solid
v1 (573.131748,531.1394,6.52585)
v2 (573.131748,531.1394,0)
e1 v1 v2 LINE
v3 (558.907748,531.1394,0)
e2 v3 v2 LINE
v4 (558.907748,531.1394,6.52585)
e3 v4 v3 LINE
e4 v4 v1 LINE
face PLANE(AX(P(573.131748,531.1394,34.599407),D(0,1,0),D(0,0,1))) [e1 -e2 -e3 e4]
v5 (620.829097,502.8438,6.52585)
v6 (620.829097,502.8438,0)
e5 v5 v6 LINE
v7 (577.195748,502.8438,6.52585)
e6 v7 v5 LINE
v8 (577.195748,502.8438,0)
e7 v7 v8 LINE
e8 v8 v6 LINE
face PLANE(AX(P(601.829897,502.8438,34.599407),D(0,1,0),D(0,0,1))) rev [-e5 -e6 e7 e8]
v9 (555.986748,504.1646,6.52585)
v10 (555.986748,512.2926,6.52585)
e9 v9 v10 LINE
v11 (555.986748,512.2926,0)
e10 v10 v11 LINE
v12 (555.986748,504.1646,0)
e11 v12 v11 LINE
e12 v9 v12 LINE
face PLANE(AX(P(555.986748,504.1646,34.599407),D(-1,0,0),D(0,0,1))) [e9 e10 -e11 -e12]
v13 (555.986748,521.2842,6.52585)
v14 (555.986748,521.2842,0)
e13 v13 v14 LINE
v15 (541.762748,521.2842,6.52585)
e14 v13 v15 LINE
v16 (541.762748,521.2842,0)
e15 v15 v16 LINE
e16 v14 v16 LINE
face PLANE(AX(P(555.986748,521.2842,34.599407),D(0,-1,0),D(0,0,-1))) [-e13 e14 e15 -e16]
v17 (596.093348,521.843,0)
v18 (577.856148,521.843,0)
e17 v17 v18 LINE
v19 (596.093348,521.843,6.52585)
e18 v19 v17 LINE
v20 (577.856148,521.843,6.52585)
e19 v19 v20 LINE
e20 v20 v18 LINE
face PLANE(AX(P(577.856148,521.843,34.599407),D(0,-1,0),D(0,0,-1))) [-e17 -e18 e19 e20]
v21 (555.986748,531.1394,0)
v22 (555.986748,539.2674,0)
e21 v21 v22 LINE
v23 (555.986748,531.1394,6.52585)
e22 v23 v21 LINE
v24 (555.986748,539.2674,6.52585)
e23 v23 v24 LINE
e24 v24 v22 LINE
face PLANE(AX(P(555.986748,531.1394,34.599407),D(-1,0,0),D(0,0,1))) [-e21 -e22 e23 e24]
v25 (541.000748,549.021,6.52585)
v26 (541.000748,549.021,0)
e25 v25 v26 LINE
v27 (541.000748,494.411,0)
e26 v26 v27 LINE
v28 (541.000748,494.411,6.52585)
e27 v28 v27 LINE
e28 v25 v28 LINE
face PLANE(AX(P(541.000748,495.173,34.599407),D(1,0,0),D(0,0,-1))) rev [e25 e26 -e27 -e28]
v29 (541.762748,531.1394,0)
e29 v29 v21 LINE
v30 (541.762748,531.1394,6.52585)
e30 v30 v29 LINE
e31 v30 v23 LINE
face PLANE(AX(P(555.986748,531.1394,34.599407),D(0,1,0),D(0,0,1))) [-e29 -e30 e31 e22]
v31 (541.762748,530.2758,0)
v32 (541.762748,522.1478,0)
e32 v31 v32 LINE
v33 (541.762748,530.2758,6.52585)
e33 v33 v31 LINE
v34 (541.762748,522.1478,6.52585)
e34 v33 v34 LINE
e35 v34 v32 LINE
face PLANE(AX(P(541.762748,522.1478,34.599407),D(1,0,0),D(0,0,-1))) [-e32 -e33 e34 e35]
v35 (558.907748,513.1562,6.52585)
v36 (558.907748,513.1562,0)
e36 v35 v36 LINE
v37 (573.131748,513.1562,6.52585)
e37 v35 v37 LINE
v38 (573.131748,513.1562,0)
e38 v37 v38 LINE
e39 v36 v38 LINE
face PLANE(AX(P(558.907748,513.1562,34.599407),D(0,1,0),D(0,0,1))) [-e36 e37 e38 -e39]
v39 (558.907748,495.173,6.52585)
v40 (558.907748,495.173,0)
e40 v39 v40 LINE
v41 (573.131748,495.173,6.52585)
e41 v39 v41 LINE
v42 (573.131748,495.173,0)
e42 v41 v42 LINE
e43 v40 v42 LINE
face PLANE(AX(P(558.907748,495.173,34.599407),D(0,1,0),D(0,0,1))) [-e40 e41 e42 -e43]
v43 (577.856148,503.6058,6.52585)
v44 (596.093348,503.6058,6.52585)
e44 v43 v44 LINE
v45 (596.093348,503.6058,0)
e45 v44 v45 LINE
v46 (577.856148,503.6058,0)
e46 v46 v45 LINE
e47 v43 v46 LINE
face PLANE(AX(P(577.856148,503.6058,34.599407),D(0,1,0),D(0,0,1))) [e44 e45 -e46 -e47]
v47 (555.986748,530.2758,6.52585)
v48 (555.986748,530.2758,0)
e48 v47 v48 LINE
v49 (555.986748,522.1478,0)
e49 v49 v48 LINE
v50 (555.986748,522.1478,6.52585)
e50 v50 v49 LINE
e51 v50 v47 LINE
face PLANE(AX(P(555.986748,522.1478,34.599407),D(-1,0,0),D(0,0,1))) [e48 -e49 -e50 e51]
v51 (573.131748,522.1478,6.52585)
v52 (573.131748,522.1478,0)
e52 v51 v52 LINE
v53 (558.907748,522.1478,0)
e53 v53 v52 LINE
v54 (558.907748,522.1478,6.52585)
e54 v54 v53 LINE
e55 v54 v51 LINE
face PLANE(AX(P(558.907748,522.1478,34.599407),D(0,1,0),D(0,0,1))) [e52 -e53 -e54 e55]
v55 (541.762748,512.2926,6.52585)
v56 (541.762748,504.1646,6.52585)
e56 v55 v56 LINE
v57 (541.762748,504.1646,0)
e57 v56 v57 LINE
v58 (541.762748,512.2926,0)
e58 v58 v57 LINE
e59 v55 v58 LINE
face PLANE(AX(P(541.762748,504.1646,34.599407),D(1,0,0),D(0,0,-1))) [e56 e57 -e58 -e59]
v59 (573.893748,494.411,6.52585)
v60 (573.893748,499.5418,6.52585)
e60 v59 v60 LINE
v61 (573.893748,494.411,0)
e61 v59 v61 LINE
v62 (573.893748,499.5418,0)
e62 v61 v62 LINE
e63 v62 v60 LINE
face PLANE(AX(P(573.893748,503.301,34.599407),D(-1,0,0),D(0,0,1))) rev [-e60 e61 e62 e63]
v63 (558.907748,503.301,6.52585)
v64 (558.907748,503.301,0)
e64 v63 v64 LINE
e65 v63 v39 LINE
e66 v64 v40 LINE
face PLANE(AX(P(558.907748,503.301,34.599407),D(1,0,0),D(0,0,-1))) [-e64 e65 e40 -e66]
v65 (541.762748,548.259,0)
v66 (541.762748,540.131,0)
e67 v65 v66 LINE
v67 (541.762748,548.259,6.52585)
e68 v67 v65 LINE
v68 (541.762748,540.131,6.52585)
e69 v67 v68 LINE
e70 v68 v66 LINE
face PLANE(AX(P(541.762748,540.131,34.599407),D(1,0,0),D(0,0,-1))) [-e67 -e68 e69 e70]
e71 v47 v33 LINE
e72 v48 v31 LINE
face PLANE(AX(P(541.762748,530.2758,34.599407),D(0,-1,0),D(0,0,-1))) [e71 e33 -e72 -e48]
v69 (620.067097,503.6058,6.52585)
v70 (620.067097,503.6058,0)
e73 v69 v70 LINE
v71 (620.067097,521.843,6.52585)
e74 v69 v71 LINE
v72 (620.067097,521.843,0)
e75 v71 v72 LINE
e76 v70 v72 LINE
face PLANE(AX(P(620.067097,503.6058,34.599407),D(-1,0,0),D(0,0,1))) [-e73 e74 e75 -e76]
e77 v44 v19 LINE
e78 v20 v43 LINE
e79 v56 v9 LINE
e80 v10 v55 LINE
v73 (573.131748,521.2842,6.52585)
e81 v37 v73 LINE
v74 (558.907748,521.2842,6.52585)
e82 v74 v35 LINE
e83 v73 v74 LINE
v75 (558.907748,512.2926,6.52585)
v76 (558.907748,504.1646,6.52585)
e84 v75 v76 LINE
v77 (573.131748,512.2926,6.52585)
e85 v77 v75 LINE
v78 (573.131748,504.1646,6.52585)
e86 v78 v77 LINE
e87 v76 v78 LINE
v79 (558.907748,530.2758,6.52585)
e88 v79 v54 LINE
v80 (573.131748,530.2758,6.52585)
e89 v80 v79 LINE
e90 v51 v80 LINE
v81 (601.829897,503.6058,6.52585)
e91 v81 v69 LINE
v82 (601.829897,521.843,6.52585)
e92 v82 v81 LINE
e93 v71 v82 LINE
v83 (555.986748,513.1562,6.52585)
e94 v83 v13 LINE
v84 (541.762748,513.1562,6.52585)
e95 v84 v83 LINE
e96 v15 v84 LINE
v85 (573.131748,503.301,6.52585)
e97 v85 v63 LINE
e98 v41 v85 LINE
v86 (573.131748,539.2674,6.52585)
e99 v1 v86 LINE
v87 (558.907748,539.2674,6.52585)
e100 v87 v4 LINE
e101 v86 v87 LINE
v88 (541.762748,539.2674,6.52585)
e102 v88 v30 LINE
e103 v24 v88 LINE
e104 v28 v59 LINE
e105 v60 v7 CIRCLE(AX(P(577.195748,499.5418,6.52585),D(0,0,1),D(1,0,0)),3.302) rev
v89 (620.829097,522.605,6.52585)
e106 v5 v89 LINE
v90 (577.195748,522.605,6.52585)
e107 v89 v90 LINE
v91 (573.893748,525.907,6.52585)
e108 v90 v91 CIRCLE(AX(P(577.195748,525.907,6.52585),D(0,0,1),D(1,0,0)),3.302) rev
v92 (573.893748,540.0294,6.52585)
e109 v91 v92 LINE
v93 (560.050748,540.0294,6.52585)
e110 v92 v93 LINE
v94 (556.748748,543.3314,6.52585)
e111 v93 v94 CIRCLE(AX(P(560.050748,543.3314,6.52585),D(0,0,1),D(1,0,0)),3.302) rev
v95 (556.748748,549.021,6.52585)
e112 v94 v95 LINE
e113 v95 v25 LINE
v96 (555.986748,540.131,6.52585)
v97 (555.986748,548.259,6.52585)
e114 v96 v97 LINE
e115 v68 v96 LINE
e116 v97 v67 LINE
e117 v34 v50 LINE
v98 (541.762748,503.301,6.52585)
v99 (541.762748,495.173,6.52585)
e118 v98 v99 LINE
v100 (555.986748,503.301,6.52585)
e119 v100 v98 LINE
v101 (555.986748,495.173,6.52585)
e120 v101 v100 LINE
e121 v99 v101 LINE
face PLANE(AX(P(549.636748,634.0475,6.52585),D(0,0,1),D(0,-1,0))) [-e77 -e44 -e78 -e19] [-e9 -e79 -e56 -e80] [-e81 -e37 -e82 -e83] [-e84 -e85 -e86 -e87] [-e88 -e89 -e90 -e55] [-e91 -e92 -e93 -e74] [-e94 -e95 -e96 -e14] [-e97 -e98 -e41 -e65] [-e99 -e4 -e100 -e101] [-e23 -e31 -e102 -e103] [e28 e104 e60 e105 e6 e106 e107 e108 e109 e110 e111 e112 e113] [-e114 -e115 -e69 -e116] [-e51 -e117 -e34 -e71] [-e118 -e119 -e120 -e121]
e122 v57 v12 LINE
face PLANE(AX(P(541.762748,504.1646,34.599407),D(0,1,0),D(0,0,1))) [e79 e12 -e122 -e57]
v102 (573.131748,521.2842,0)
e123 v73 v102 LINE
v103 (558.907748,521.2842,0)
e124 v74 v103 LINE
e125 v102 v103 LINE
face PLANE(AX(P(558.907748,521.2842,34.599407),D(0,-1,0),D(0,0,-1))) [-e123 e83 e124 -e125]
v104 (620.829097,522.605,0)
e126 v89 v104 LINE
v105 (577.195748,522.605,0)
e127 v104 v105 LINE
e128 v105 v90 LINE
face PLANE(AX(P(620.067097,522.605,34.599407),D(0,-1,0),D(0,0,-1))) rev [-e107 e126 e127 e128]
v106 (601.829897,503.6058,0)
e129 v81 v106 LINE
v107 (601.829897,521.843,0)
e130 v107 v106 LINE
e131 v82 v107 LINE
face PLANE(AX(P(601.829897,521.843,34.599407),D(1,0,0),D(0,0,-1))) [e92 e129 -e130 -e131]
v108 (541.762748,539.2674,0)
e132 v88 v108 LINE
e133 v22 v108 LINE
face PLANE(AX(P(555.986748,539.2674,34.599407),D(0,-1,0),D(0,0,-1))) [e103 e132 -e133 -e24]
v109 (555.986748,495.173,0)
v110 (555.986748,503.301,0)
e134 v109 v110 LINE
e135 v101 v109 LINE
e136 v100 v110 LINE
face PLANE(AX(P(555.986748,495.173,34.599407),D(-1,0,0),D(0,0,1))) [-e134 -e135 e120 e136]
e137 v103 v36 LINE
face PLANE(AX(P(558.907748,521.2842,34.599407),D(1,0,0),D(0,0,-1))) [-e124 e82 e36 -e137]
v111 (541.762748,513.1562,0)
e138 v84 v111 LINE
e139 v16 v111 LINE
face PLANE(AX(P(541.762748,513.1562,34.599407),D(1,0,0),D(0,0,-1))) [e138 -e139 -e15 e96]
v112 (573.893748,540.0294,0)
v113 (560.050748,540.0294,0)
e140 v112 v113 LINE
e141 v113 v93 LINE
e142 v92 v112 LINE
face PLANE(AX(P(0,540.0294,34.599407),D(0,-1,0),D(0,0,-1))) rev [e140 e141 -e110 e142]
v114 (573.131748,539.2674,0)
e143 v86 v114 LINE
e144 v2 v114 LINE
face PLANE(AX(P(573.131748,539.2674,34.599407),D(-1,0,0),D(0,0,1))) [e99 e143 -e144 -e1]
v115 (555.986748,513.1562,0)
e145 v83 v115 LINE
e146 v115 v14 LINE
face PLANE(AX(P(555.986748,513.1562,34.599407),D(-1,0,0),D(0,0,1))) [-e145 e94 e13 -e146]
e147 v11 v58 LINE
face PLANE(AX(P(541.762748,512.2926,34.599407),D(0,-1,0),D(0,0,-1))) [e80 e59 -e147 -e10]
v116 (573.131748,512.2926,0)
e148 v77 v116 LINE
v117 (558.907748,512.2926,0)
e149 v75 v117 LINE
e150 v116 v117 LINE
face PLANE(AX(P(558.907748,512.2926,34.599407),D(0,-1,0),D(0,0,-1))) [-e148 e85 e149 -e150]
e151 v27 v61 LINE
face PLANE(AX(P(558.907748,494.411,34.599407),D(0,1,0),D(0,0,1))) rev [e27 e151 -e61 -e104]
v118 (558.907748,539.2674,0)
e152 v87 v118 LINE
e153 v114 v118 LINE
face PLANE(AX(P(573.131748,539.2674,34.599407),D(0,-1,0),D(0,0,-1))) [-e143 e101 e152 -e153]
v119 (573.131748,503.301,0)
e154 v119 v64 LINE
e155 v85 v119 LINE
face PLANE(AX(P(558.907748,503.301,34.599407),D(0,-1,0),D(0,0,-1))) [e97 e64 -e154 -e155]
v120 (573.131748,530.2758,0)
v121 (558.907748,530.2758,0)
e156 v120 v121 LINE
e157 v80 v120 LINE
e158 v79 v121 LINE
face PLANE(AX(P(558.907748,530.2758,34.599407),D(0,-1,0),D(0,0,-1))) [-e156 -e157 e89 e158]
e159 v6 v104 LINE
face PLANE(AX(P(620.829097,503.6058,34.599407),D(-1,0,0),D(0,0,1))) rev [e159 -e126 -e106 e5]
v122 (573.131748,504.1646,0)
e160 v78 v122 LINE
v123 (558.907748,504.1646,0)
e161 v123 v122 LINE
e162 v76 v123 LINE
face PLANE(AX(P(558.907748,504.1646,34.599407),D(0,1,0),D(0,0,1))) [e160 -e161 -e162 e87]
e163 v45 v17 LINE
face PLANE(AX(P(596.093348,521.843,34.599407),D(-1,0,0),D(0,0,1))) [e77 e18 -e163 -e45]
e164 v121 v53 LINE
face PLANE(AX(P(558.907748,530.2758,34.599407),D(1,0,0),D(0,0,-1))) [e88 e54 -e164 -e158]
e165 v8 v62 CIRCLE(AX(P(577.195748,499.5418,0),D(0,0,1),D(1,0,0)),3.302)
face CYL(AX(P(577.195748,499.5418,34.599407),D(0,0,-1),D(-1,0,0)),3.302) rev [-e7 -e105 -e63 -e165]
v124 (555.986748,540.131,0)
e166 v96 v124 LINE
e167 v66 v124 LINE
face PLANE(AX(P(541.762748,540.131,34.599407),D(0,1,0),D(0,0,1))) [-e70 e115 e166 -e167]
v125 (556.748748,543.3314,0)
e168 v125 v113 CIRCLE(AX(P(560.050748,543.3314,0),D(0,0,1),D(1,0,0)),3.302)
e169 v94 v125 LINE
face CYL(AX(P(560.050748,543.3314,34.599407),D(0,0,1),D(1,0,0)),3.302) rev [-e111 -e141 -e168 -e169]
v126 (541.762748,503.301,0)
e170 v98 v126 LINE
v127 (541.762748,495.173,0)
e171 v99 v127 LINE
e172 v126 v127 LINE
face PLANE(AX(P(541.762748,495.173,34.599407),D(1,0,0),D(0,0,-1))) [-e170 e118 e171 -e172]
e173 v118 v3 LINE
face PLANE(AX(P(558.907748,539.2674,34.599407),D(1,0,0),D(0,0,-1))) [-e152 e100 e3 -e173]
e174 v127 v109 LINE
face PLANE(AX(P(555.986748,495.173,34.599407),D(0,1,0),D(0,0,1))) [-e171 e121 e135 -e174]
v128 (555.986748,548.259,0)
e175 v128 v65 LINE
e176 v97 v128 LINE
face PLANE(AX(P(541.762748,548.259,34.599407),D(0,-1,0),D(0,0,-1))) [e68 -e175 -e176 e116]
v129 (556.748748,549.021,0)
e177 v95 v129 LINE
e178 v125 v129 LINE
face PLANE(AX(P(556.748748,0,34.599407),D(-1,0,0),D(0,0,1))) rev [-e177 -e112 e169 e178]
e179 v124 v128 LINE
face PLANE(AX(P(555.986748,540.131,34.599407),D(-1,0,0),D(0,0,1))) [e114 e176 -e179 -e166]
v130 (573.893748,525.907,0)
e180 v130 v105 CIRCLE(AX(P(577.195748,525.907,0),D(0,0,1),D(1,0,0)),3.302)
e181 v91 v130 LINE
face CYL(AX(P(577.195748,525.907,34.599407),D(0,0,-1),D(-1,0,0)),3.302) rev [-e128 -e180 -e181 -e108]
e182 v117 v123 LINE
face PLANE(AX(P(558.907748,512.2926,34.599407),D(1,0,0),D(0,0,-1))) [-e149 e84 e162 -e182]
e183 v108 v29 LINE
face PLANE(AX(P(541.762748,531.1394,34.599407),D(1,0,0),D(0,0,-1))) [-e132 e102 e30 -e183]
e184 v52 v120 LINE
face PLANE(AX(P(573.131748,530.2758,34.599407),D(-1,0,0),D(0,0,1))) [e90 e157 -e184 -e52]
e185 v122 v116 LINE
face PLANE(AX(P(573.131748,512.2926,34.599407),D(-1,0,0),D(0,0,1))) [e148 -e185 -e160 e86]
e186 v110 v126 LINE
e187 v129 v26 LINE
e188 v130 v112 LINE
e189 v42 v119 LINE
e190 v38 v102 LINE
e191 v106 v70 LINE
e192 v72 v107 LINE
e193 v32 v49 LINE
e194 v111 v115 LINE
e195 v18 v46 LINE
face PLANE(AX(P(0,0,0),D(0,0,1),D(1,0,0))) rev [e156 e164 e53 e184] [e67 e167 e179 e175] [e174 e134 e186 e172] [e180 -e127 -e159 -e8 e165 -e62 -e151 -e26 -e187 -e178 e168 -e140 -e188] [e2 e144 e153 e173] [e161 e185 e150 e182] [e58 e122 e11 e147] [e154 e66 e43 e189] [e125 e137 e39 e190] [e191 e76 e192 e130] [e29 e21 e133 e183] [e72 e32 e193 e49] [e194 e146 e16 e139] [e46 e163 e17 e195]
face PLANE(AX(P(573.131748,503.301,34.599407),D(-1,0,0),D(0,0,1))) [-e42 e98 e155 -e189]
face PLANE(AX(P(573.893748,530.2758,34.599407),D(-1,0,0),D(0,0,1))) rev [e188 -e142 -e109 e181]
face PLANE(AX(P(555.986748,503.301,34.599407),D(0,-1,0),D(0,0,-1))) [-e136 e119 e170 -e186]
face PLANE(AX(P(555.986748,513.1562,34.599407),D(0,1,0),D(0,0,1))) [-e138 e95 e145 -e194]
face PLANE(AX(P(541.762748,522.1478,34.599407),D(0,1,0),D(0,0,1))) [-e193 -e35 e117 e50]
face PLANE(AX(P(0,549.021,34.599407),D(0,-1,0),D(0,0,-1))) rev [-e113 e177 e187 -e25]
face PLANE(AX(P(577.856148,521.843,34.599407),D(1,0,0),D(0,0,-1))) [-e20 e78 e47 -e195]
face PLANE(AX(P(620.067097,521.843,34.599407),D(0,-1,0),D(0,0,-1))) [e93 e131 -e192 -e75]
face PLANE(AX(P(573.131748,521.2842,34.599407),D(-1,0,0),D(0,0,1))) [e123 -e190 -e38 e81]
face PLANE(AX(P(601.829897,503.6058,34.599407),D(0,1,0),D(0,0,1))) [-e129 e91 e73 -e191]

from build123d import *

# Parameters (mm, degrees)
EXTRUDE_THIN1_OUTLINE_W      = 19.7612
EXTRUDE_THIN1_OUTLINE_H      = 19.7612
EXTRUDE_THIN1_OUTLINE_W_2    = 18.2372
EXTRUDE_THIN1_OUTLINE_H_2    = 18.2372
EXTRUDE_THIN1_DEPTH          = 6.52585
EXTRUDE_THIN1_2_OUTLINE_W    = 15.748
EXTRUDE_THIN1_2_OUTLINE_H    = 9.652
EXTRUDE_THIN1_2_OUTLINE_W_2  = 14.224
EXTRUDE_THIN1_2_OUTLINE_H_2  = 8.128
EXTRUDE_THIN1_2_DEPTH        = 6.52585
EXTRUDE_THIN1_3_OUTLINE_W    = 15.748
EXTRUDE_THIN1_3_OUTLINE_H    = 9.652
EXTRUDE_THIN1_3_OUTLINE_W_2  = 14.224
EXTRUDE_THIN1_3_OUTLINE_H_2  = 8.128
EXTRUDE_THIN1_3_DEPTH        = 6.52585
EXTRUDE_THIN1_4_OUTLINE_W    = 15.748
EXTRUDE_THIN1_4_OUTLINE_H    = 9.652
EXTRUDE_THIN1_4_OUTLINE_W_2  = 14.224
EXTRUDE_THIN1_4_OUTLINE_H_2  = 8.128
EXTRUDE_THIN1_4_DEPTH        = 6.52585
EXTRUDE_THIN1_5_OUTLINE_W    = 15.748
EXTRUDE_THIN1_5_OUTLINE_H    = 9.652
EXTRUDE_THIN1_5_OUTLINE_W_2  = 14.224
EXTRUDE_THIN1_5_OUTLINE_H_2  = 8.128
EXTRUDE_THIN1_5_DEPTH        = 6.52585
EXTRUDE_THIN1_6_OUTLINE_W    = 15.748
EXTRUDE_THIN1_6_OUTLINE_H    = 9.652
EXTRUDE_THIN1_6_OUTLINE_W_2  = 14.224
EXTRUDE_THIN1_6_OUTLINE_H_2  = 8.128
EXTRUDE_THIN1_6_DEPTH        = 6.52585
EXTRUDE_THIN1_7_OUTLINE_W    = 15.748
EXTRUDE_THIN1_7_OUTLINE_H    = 9.652
EXTRUDE_THIN1_7_OUTLINE_W_2  = 14.224
EXTRUDE_THIN1_7_OUTLINE_H_2  = 8.128
EXTRUDE_THIN1_7_DEPTH        = 6.52585
EXTRUDE_THIN1_8_OUTLINE_W    = 15.748
EXTRUDE_THIN1_8_OUTLINE_H    = 9.652
EXTRUDE_THIN1_8_OUTLINE_W_2  = 14.224
EXTRUDE_THIN1_8_OUTLINE_H_2  = 8.128
EXTRUDE_THIN1_8_DEPTH        = 6.52585
EXTRUDE_THIN1_9_OUTLINE_W    = 15.748
EXTRUDE_THIN1_9_OUTLINE_H    = 9.652
EXTRUDE_THIN1_9_OUTLINE_W_2  = 14.224
EXTRUDE_THIN1_9_OUTLINE_H_2  = 8.128
EXTRUDE_THIN1_9_DEPTH        = 6.52585
EXTRUDE_THIN1_10_OUTLINE_W   = 15.748
EXTRUDE_THIN1_10_OUTLINE_H   = 9.652
EXTRUDE_THIN1_10_OUTLINE_W_2 = 14.224
EXTRUDE_THIN1_10_OUTLINE_H_2 = 8.128
EXTRUDE_THIN1_10_DEPTH       = 6.52585
EXTRUDE_THIN1_11_OUTLINE_W   = 15.748
EXTRUDE_THIN1_11_OUTLINE_H   = 9.652
EXTRUDE_THIN1_11_OUTLINE_W_2 = 14.224
EXTRUDE_THIN1_11_OUTLINE_H_2 = 8.128
EXTRUDE_THIN1_11_DEPTH       = 6.52585
EXTRUDE_THIN1_12_OUTLINE_W   = 15.748
EXTRUDE_THIN1_12_OUTLINE_H   = 9.652
EXTRUDE_THIN1_12_OUTLINE_W_2 = 14.224
EXTRUDE_THIN1_12_OUTLINE_H_2 = 8.128
EXTRUDE_THIN1_12_DEPTH       = 6.52585
EXTRUDE_THIN1_13_OUTLINE_W   = 19.7612
EXTRUDE_THIN1_13_OUTLINE_H   = 19.7612
EXTRUDE_THIN1_13_OUTLINE_W_2 = 18.2372
EXTRUDE_THIN1_13_OUTLINE_H_2 = 18.2372
EXTRUDE_THIN1_13_DEPTH       = 6.52585
BOSS_EXTRUDE1_START          = -6.52585
SKETCH3_W                    = 1.397
SKETCH3_H                    = 45.6184
SKETCH3_W_2                  = 3.2004
SKETCH3_H_2                  = 19.7612
SKETCH3_W_3                  = 4.212549516
BOSS_EXTRUDE1_DEPTH          = 6.52585
FILLET1_R                    = 3.302


# Read off the part's stored shape, not the designer's step: Extrude-Thin1
with BuildPart() as part:
    # Extrude-Thin1 outline → Extrude-Thin1 (new body)
    with BuildSketch(Plane.XY):
        with Locations((610.948497092, 512.7244)):
            Rectangle(EXTRUDE_THIN1_OUTLINE_W, EXTRUDE_THIN1_OUTLINE_H)
        with Locations((610.948497092, 512.7244)):
            Rectangle(EXTRUDE_THIN1_OUTLINE_W_2, EXTRUDE_THIN1_OUTLINE_H_2, mode=Mode.SUBTRACT)
    extrude(amount=EXTRUDE_THIN1_DEPTH)



with BuildPart() as body_2:
    # Extrude-Thin1 2 outline → Extrude-Thin1 2 (new body)
    with BuildSketch(Plane.XY):
        with Locations((548.874747576, 544.195)):
            Rectangle(EXTRUDE_THIN1_2_OUTLINE_W, EXTRUDE_THIN1_2_OUTLINE_H)
        with Locations((548.874747576, 544.195)):
            Rectangle(EXTRUDE_THIN1_2_OUTLINE_W_2, EXTRUDE_THIN1_2_OUTLINE_H_2, mode=Mode.SUBTRACT)
    extrude(amount=EXTRUDE_THIN1_2_DEPTH)


with BuildPart() as body_3:
    # Extrude-Thin1 3 outline → Extrude-Thin1 3 (new body)
    with BuildSketch(Plane.XY):
        with Locations((548.874747576, 535.2034)):
            Rectangle(EXTRUDE_THIN1_3_OUTLINE_W, EXTRUDE_THIN1_3_OUTLINE_H)
        with Locations((548.874747576, 535.2034)):
            Rectangle(EXTRUDE_THIN1_3_OUTLINE_W_2, EXTRUDE_THIN1_3_OUTLINE_H_2, mode=Mode.SUBTRACT)
    extrude(amount=EXTRUDE_THIN1_3_DEPTH)


with BuildPart() as body_4:
    # Extrude-Thin1 4 outline → Extrude-Thin1 4 (new body)
    with BuildSketch(Plane.XY):
        with Locations((548.874747576, 526.2118)):
            Rectangle(EXTRUDE_THIN1_4_OUTLINE_W, EXTRUDE_THIN1_4_OUTLINE_H)
        with Locations((548.874747576, 526.2118)):
            Rectangle(EXTRUDE_THIN1_4_OUTLINE_W_2, EXTRUDE_THIN1_4_OUTLINE_H_2, mode=Mode.SUBTRACT)
    extrude(amount=EXTRUDE_THIN1_4_DEPTH)


with BuildPart() as body_5:
    # Extrude-Thin1 5 outline → Extrude-Thin1 5 (new body)
    with BuildSketch(Plane.XY):
        with Locations((548.874747576, 517.2202)):
            Rectangle(EXTRUDE_THIN1_5_OUTLINE_W, EXTRUDE_THIN1_5_OUTLINE_H)
        with Locations((548.874747576, 517.2202)):
            Rectangle(EXTRUDE_THIN1_5_OUTLINE_W_2, EXTRUDE_THIN1_5_OUTLINE_H_2, mode=Mode.SUBTRACT)
    extrude(amount=EXTRUDE_THIN1_5_DEPTH)


with BuildPart() as body_6:
    # Extrude-Thin1 6 outline → Extrude-Thin1 6 (new body)
    with BuildSketch(Plane.XY):
        with Locations((548.874747576, 508.2286)):
            Rectangle(EXTRUDE_THIN1_6_OUTLINE_W, EXTRUDE_THIN1_6_OUTLINE_H)
        with Locations((548.874747576, 508.2286)):
            Rectangle(EXTRUDE_THIN1_6_OUTLINE_W_2, EXTRUDE_THIN1_6_OUTLINE_H_2, mode=Mode.SUBTRACT)
    extrude(amount=EXTRUDE_THIN1_6_DEPTH)


with BuildPart() as body_7:
    # Extrude-Thin1 7 outline → Extrude-Thin1 7 (new body)
    with BuildSketch(Plane.XY):
        with Locations((548.874747576, 499.237)):
            Rectangle(EXTRUDE_THIN1_7_OUTLINE_W, EXTRUDE_THIN1_7_OUTLINE_H)
        with Locations((548.874747576, 499.237)):
            Rectangle(EXTRUDE_THIN1_7_OUTLINE_W_2, EXTRUDE_THIN1_7_OUTLINE_H_2, mode=Mode.SUBTRACT)
    extrude(amount=EXTRUDE_THIN1_7_DEPTH)


with BuildPart() as body_8:
    # Extrude-Thin1 8 outline → Extrude-Thin1 8 (new body)
    with BuildSketch(Plane.XY):
        with Locations((566.019747576, 499.237)):
            Rectangle(EXTRUDE_THIN1_8_OUTLINE_W, EXTRUDE_THIN1_8_OUTLINE_H)
        with Locations((566.019747576, 499.237)):
            Rectangle(EXTRUDE_THIN1_8_OUTLINE_W_2, EXTRUDE_THIN1_8_OUTLINE_H_2, mode=Mode.SUBTRACT)
    extrude(amount=EXTRUDE_THIN1_8_DEPTH)


with BuildPart() as body_9:
    # Extrude-Thin1 9 outline → Extrude-Thin1 9 (new body)
    with BuildSketch(Plane.XY):
        with Locations((566.019747576, 508.2286)):
            Rectangle(EXTRUDE_THIN1_9_OUTLINE_W, EXTRUDE_THIN1_9_OUTLINE_H)
        with Locations((566.019747576, 508.2286)):
            Rectangle(EXTRUDE_THIN1_9_OUTLINE_W_2, EXTRUDE_THIN1_9_OUTLINE_H_2, mode=Mode.SUBTRACT)
    extrude(amount=EXTRUDE_THIN1_9_DEPTH)


with BuildPart() as body_10:
    # Extrude-Thin1 10 outline → Extrude-Thin1 10 (new body)
    with BuildSketch(Plane.XY):
        with Locations((566.019747576, 517.2202)):
            Rectangle(EXTRUDE_THIN1_10_OUTLINE_W, EXTRUDE_THIN1_10_OUTLINE_H)
        with Locations((566.019747576, 517.2202)):
            Rectangle(EXTRUDE_THIN1_10_OUTLINE_W_2, EXTRUDE_THIN1_10_OUTLINE_H_2, mode=Mode.SUBTRACT)
    extrude(amount=EXTRUDE_THIN1_10_DEPTH)


with BuildPart() as body_11:
    # Extrude-Thin1 11 outline → Extrude-Thin1 11 (new body)
    with BuildSketch(Plane.XY):
        with Locations((566.019747576, 535.2034)):
            Rectangle(EXTRUDE_THIN1_11_OUTLINE_W, EXTRUDE_THIN1_11_OUTLINE_H)
        with Locations((566.019747576, 535.2034)):
            Rectangle(EXTRUDE_THIN1_11_OUTLINE_W_2, EXTRUDE_THIN1_11_OUTLINE_H_2, mode=Mode.SUBTRACT)
    extrude(amount=EXTRUDE_THIN1_11_DEPTH)


with BuildPart() as body_12:
    # Extrude-Thin1 12 outline → Extrude-Thin1 12 (new body)
    with BuildSketch(Plane.XY):
        with Locations((566.019747576, 526.2118)):
            Rectangle(EXTRUDE_THIN1_12_OUTLINE_W, EXTRUDE_THIN1_12_OUTLINE_H)
        with Locations((566.019747576, 526.2118)):
            Rectangle(EXTRUDE_THIN1_12_OUTLINE_W_2, EXTRUDE_THIN1_12_OUTLINE_H_2, mode=Mode.SUBTRACT)
    extrude(amount=EXTRUDE_THIN1_12_DEPTH)


with BuildPart() as body_13:
    # Extrude-Thin1 13 outline → Extrude-Thin1 13 (new body)
    with BuildSketch(Plane.XY):
        with Locations((586.974747576, 512.7244)):
            Rectangle(EXTRUDE_THIN1_13_OUTLINE_W, EXTRUDE_THIN1_13_OUTLINE_H)
        with Locations((586.974747576, 512.7244)):
            Rectangle(EXTRUDE_THIN1_13_OUTLINE_W_2, EXTRUDE_THIN1_13_OUTLINE_H_2, mode=Mode.SUBTRACT)
    extrude(amount=EXTRUDE_THIN1_13_DEPTH)


with BuildPart() as part_1:
    add(part.part)

    add(body_2.part)  # Boss-Extrude1 merges body 2

    add(body_3.part)  # Boss-Extrude1 merges body 3

    add(body_4.part)  # Boss-Extrude1 merges body 4

    add(body_5.part)  # Boss-Extrude1 merges body 5

    add(body_6.part)  # Boss-Extrude1 merges body 6

    add(body_7.part)  # Boss-Extrude1 merges body 7

    add(body_8.part)  # Boss-Extrude1 merges body 8

    add(body_9.part)  # Boss-Extrude1 merges body 9

    add(body_10.part)  # Boss-Extrude1 merges body 10

    add(body_11.part)  # Boss-Extrude1 merges body 11

    add(body_12.part)  # Boss-Extrude1 merges body 12

    add(body_13.part)  # Boss-Extrude1 merges body 13
    # Sketch3 → Boss-Extrude1 (add)
    with BuildSketch(Plane.XY.offset(6.52585).offset(BOSS_EXTRUDE1_START)):
        with Locations((557.447247576, 517.2202)):
            Rectangle(SKETCH3_W, SKETCH3_H)
        with Locations((575.493947576, 512.7244)):
            Rectangle(SKETCH3_W_2, SKETCH3_H_2)
        with Locations((598.961622334, 512.7244)):
            Rectangle(SKETCH3_W_3, SKETCH3_H_2)
    extrude(amount=BOSS_EXTRUDE1_DEPTH)

    # Fillet1
    fillet1_edges = [part_1.edges().sort_by_distance(p)[0] for p in [
        (556.748747576, 540.0294, 3.262925),
        (573.893747576, 502.8438, 3.262925),
        (573.893747576, 522.605, 3.262925),
    ]]
    fillet(fillet1_edges, radius=FILLET1_R)


solid = part_1.part
